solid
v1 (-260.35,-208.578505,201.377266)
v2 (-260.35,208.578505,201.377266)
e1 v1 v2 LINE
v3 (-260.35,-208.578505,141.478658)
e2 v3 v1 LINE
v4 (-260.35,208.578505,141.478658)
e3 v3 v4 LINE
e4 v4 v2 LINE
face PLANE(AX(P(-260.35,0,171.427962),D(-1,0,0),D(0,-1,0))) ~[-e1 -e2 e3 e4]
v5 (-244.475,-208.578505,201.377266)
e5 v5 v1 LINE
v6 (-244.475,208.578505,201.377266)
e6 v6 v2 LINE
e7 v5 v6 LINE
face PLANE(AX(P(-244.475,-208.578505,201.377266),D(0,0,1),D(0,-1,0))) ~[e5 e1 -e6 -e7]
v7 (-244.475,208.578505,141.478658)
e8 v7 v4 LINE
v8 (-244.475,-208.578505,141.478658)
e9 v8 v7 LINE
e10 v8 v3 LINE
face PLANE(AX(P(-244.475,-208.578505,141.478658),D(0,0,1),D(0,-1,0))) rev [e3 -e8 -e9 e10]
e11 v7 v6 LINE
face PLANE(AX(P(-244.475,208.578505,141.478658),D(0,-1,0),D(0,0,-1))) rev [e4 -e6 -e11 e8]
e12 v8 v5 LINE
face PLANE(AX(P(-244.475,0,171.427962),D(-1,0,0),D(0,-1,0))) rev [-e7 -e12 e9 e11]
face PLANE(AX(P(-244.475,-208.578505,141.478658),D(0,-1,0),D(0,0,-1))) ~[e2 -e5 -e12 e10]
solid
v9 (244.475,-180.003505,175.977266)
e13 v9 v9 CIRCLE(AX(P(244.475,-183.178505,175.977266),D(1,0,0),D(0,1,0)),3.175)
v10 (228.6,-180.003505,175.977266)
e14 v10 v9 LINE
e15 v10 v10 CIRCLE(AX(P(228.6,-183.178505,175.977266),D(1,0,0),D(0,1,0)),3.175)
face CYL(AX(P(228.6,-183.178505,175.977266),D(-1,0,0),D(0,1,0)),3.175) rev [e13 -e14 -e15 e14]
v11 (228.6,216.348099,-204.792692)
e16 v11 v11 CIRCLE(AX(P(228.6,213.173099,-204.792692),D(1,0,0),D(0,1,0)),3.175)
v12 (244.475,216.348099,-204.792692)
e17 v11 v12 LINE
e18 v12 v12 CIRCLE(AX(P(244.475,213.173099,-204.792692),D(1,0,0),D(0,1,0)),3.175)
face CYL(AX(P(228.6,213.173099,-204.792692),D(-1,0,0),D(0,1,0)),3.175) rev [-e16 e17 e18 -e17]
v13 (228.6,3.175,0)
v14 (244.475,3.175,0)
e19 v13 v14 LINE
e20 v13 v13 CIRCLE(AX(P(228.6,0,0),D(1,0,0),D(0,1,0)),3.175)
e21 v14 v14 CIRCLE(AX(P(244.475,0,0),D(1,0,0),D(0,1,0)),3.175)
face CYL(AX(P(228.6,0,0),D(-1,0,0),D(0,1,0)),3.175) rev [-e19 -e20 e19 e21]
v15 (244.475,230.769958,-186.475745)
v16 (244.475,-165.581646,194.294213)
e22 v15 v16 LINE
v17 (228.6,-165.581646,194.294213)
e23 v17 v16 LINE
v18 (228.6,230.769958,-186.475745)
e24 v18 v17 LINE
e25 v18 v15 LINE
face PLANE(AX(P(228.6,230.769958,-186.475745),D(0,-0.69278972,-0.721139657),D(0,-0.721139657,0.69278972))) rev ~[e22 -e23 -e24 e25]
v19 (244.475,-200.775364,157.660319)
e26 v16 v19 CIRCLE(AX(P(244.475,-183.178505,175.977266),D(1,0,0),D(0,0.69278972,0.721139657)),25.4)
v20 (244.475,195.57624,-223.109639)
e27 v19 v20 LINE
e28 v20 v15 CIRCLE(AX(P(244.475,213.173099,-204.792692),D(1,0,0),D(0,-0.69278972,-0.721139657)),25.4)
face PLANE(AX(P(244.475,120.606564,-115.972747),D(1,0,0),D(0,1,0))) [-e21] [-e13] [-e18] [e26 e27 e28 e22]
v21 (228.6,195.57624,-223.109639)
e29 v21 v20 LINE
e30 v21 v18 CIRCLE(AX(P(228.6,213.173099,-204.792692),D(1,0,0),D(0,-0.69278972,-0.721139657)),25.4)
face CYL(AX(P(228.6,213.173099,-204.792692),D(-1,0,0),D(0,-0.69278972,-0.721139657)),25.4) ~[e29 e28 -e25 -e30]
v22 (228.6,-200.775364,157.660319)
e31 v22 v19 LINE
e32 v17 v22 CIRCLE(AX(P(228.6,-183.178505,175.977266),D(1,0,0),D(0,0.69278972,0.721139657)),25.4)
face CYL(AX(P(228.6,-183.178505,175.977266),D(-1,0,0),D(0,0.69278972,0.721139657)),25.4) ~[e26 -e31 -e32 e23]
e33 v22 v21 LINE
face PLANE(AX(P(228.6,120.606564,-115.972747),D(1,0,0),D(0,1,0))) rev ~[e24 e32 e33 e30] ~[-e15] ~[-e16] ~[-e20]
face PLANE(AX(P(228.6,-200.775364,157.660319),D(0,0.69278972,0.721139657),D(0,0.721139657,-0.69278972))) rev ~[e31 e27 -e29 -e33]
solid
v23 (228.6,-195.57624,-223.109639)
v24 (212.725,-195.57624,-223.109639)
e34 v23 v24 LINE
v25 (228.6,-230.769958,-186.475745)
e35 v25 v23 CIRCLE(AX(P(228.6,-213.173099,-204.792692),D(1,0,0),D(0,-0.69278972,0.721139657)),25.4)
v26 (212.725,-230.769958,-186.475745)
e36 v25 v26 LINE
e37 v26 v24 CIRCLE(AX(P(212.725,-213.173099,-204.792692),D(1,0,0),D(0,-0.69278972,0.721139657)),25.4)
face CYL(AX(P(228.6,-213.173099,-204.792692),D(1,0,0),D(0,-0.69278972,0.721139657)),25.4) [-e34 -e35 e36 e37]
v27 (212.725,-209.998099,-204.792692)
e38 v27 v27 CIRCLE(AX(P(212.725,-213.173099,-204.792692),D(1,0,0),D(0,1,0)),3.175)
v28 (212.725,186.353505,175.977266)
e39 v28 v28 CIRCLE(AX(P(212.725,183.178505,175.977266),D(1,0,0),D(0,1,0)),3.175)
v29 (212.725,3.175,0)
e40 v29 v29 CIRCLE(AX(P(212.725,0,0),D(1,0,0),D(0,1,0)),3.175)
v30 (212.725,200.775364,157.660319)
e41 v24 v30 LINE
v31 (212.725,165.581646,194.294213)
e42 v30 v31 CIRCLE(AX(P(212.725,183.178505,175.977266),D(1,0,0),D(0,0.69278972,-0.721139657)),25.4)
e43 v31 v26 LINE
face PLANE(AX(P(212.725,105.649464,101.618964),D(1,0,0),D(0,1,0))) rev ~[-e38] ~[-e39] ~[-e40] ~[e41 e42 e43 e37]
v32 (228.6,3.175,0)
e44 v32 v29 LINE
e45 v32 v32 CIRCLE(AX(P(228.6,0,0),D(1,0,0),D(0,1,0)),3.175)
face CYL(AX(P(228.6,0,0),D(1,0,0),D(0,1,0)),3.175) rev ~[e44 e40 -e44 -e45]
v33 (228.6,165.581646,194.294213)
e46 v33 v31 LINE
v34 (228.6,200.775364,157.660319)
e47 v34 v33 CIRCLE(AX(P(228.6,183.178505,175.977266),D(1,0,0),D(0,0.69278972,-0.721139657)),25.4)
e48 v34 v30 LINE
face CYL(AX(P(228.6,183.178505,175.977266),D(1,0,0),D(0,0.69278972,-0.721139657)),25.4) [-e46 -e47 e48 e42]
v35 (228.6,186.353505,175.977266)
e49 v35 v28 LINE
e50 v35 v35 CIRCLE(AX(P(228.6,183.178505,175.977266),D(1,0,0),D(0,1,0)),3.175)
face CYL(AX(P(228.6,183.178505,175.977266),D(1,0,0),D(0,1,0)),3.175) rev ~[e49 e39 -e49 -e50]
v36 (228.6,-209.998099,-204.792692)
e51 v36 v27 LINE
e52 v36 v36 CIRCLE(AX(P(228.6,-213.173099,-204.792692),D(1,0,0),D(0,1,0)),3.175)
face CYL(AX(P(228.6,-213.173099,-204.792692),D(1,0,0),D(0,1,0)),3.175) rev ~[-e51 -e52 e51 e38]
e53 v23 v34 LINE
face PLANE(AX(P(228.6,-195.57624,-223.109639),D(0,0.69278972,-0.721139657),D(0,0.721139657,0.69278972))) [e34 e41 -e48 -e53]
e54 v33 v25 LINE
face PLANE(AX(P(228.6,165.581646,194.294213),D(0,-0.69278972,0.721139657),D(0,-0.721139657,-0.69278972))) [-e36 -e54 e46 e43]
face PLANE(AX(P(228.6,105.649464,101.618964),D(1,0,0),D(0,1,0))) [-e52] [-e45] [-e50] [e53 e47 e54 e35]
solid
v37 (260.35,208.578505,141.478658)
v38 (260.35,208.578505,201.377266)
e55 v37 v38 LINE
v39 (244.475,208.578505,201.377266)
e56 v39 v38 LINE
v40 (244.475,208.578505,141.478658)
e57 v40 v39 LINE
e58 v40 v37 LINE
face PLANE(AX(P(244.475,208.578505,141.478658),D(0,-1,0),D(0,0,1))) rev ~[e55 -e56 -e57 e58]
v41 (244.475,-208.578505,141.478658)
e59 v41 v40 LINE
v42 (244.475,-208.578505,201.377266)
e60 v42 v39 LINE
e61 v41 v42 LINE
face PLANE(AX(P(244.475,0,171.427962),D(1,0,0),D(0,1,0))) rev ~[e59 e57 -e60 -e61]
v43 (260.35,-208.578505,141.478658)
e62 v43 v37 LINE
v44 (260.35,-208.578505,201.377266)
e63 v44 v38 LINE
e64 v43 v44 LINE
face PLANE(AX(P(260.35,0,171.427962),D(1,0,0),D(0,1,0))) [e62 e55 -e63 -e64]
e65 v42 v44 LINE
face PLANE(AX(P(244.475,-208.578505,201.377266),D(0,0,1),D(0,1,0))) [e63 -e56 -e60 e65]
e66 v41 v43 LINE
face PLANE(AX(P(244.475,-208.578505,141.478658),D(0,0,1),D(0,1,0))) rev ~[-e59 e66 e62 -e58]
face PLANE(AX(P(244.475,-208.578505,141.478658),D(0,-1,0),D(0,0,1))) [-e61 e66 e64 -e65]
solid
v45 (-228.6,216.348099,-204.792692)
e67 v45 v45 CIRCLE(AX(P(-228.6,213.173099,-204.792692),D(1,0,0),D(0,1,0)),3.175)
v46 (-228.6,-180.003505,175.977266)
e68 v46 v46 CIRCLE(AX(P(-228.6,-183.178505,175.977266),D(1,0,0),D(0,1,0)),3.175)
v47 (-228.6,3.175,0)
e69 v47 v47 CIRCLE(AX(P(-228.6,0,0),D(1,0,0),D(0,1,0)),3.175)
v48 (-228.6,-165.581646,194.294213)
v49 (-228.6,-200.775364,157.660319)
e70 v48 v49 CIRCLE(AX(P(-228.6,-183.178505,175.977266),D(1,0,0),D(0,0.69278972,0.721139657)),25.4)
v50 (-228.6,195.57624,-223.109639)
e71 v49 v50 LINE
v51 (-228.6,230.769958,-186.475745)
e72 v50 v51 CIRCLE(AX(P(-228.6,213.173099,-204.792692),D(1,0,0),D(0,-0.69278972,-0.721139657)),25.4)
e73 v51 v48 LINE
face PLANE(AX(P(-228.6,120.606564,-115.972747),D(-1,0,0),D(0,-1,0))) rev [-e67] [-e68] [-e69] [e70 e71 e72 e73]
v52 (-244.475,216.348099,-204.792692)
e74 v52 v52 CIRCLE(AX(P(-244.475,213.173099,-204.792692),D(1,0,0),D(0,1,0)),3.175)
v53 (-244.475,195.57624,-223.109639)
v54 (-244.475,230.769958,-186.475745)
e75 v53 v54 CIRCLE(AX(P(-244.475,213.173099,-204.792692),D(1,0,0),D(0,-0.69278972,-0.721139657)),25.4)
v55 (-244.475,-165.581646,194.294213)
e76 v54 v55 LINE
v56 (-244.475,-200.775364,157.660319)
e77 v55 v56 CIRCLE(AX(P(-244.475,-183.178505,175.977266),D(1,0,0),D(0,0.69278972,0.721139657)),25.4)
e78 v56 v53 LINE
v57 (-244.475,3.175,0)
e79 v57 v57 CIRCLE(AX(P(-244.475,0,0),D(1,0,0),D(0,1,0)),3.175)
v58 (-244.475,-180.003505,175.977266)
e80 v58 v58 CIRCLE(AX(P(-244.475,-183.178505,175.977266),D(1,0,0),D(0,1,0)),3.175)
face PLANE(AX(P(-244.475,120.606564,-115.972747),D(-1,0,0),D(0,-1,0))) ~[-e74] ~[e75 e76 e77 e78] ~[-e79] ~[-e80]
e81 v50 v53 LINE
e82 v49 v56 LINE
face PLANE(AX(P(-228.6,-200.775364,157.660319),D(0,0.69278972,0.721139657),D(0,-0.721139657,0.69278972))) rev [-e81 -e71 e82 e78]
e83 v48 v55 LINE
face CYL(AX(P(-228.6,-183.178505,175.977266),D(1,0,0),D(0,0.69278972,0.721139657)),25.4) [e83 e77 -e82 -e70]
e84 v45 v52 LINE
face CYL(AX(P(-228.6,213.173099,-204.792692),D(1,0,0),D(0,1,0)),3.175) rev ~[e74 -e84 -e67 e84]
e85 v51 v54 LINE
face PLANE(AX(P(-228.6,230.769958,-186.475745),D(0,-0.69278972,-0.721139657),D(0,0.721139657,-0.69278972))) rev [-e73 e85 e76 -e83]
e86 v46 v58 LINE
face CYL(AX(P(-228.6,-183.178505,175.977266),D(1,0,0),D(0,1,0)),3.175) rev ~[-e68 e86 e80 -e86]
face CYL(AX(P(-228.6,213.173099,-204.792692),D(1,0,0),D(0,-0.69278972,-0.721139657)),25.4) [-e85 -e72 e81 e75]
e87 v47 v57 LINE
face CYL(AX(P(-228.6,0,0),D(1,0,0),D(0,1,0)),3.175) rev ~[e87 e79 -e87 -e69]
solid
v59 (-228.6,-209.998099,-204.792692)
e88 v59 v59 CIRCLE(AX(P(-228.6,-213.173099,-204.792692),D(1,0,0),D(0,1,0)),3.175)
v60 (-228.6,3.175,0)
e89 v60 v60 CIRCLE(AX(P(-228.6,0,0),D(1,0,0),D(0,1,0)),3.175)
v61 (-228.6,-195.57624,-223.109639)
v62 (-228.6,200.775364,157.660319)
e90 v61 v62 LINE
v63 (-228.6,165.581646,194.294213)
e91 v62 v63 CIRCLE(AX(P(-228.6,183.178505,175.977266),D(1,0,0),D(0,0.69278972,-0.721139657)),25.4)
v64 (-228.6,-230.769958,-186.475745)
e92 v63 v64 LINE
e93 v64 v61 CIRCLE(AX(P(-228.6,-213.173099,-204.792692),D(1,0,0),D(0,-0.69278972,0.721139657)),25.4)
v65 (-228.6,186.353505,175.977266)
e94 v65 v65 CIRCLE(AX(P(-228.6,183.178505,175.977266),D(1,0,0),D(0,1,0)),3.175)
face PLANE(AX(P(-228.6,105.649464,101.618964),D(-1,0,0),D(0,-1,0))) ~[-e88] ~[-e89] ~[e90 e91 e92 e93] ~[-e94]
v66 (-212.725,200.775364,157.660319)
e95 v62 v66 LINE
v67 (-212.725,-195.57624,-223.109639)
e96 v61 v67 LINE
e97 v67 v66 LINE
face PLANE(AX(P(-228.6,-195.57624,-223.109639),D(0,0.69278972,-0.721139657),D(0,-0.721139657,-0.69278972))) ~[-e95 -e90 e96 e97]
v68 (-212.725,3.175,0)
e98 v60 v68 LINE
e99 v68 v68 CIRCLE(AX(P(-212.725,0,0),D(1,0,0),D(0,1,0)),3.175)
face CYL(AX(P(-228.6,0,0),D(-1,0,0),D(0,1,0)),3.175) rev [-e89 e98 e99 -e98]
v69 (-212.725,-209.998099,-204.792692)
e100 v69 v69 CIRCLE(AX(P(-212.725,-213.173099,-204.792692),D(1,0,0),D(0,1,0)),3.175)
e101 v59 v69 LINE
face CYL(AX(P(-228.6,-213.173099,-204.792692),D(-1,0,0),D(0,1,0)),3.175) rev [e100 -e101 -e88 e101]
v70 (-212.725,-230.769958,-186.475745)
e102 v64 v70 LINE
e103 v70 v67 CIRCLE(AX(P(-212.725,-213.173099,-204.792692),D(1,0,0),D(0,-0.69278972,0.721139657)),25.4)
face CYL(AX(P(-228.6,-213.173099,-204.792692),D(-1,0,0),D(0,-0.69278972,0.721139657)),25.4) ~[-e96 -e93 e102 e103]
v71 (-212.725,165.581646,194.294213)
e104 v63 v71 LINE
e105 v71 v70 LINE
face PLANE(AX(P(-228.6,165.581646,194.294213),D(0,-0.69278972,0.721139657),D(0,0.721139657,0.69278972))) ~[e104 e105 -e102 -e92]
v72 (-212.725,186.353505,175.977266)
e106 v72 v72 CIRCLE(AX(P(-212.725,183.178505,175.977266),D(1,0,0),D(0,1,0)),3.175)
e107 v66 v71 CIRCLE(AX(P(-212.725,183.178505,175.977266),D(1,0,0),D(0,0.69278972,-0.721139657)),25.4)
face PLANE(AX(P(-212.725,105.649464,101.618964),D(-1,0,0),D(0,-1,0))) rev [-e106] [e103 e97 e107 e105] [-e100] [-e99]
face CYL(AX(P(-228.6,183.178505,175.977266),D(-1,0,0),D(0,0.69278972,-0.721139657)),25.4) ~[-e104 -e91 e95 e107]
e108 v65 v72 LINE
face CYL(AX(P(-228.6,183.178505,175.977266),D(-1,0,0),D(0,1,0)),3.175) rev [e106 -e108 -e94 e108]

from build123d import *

# Parameters (mm, degrees)
F2_R     = 3.175
F3_DEPTH = 15.875
F4_DEPTH = 15.875
F5_W     = 417.1570104862
F5_H     = 59.898608482
F6_DEPTH = 15.875


# Not quite as in the source:
# - a length typed as a fraction of an inch, garbled in the dataset ("3 / 203.2 mm" for 3/8 in), is restored


with BuildPart() as f3:
    # F2 (on line) → F3 (new body)
    with BuildSketch(Plane.YZ.offset(228.6)):
        with BuildLine():
            Line((36.6633615893, 0), (0, -35.2220263714))
            Line((0, -35.2220263714), (195.5762402522, -223.1096393228))
            ThreePointArc((195.5762402522, -223.1096393228), (231.4900464095, -222.3895509281), (230.7699580147, -186.4757447708))
            Line((230.7699580147, -186.4757447708), (36.6633615893, 0))
        make_face()
        with Locations((213.1730991335, -204.7926920468)):
            Circle(F2_R, mode=Mode.SUBTRACT)
        with BuildLine():
            Line((-200.7753641244, 157.6603189284), (-36.6633615893, 0))
            Line((-36.6633615893, 0), (0, 35.2220263714))
            Line((0, 35.2220263714), (-165.5816463618, 194.2942134805))
            ThreePointArc((-165.5816463618, 194.2942134805), (-201.4954525191, 193.5741250857), (-200.7753641244, 157.6603189284))
        make_face()
        with Locations((-183.1785052431, 175.9772662045)):
            Circle(F2_R, mode=Mode.SUBTRACT)
        Polygon((0, 35.2220263714), (-36.6633615893, 0), (0, -35.2220263714), (36.6633615893, 0), align=None)
        Circle(F2_R, mode=Mode.SUBTRACT)
    extrude(amount=F3_DEPTH)


with BuildPart() as f4:
    # F2 (on line) → F4 (new body)
    with BuildSketch(Plane.YZ.offset(228.6)):
        with BuildLine():
            Line((165.5816463618, 194.2942134805), (0, 35.2220263714))
            Line((0, 35.2220263714), (36.6633615893, 0))
            Line((36.6633615893, 0), (200.7753641244, 157.6603189284))
            ThreePointArc((200.7753641244, 157.6603189284), (201.4954525191, 193.5741250857), (165.5816463618, 194.2942134805))
        make_face()
        with Locations((183.1785052431, 175.9772662045)):
            Circle(F2_R, mode=Mode.SUBTRACT)
        Polygon((0, 35.2220263714), (-36.6633615893, 0), (0, -35.2220263714), (36.6633615893, 0), align=None)
        Circle(F2_R, mode=Mode.SUBTRACT)
        with BuildLine():
            Line((-36.6633615893, 0), (-230.7699580147, -186.4757447708))
            ThreePointArc((-230.7699580147, -186.4757447708), (-231.4900464095, -222.3895509281), (-195.5762402522, -223.1096393228))
            Line((-195.5762402522, -223.1096393228), (0, -35.2220263714))
            Line((0, -35.2220263714), (-36.6633615893, 0))
        make_face()
        with Locations((-213.1730991335, -204.7926920468)):
            Circle(F2_R, mode=Mode.SUBTRACT)
    extrude(amount=-F4_DEPTH)


with BuildPart() as f6:
    # F5 (on face) → F6 (new body)
    with BuildSketch(Plane.YZ.offset(244.475)):
        with Locations((0, 171.4279619635)):
            Rectangle(F5_W, F5_H)
    extrude(amount=F6_DEPTH)


with BuildPart() as f7_1:
    # F7: instance of F4
    add(f4.part.mirror(Plane.YZ))


with BuildPart() as f7_2:
    # F7: instance of F3
    add(f3.part.mirror(Plane.YZ))


with BuildPart() as f7_3:
    # F7: instance of F6
    add(f6.part.mirror(Plane.YZ))


solid = Compound([f3.part, f4.part, f6.part, f7_1.part, f7_2.part, f7_3.part])
